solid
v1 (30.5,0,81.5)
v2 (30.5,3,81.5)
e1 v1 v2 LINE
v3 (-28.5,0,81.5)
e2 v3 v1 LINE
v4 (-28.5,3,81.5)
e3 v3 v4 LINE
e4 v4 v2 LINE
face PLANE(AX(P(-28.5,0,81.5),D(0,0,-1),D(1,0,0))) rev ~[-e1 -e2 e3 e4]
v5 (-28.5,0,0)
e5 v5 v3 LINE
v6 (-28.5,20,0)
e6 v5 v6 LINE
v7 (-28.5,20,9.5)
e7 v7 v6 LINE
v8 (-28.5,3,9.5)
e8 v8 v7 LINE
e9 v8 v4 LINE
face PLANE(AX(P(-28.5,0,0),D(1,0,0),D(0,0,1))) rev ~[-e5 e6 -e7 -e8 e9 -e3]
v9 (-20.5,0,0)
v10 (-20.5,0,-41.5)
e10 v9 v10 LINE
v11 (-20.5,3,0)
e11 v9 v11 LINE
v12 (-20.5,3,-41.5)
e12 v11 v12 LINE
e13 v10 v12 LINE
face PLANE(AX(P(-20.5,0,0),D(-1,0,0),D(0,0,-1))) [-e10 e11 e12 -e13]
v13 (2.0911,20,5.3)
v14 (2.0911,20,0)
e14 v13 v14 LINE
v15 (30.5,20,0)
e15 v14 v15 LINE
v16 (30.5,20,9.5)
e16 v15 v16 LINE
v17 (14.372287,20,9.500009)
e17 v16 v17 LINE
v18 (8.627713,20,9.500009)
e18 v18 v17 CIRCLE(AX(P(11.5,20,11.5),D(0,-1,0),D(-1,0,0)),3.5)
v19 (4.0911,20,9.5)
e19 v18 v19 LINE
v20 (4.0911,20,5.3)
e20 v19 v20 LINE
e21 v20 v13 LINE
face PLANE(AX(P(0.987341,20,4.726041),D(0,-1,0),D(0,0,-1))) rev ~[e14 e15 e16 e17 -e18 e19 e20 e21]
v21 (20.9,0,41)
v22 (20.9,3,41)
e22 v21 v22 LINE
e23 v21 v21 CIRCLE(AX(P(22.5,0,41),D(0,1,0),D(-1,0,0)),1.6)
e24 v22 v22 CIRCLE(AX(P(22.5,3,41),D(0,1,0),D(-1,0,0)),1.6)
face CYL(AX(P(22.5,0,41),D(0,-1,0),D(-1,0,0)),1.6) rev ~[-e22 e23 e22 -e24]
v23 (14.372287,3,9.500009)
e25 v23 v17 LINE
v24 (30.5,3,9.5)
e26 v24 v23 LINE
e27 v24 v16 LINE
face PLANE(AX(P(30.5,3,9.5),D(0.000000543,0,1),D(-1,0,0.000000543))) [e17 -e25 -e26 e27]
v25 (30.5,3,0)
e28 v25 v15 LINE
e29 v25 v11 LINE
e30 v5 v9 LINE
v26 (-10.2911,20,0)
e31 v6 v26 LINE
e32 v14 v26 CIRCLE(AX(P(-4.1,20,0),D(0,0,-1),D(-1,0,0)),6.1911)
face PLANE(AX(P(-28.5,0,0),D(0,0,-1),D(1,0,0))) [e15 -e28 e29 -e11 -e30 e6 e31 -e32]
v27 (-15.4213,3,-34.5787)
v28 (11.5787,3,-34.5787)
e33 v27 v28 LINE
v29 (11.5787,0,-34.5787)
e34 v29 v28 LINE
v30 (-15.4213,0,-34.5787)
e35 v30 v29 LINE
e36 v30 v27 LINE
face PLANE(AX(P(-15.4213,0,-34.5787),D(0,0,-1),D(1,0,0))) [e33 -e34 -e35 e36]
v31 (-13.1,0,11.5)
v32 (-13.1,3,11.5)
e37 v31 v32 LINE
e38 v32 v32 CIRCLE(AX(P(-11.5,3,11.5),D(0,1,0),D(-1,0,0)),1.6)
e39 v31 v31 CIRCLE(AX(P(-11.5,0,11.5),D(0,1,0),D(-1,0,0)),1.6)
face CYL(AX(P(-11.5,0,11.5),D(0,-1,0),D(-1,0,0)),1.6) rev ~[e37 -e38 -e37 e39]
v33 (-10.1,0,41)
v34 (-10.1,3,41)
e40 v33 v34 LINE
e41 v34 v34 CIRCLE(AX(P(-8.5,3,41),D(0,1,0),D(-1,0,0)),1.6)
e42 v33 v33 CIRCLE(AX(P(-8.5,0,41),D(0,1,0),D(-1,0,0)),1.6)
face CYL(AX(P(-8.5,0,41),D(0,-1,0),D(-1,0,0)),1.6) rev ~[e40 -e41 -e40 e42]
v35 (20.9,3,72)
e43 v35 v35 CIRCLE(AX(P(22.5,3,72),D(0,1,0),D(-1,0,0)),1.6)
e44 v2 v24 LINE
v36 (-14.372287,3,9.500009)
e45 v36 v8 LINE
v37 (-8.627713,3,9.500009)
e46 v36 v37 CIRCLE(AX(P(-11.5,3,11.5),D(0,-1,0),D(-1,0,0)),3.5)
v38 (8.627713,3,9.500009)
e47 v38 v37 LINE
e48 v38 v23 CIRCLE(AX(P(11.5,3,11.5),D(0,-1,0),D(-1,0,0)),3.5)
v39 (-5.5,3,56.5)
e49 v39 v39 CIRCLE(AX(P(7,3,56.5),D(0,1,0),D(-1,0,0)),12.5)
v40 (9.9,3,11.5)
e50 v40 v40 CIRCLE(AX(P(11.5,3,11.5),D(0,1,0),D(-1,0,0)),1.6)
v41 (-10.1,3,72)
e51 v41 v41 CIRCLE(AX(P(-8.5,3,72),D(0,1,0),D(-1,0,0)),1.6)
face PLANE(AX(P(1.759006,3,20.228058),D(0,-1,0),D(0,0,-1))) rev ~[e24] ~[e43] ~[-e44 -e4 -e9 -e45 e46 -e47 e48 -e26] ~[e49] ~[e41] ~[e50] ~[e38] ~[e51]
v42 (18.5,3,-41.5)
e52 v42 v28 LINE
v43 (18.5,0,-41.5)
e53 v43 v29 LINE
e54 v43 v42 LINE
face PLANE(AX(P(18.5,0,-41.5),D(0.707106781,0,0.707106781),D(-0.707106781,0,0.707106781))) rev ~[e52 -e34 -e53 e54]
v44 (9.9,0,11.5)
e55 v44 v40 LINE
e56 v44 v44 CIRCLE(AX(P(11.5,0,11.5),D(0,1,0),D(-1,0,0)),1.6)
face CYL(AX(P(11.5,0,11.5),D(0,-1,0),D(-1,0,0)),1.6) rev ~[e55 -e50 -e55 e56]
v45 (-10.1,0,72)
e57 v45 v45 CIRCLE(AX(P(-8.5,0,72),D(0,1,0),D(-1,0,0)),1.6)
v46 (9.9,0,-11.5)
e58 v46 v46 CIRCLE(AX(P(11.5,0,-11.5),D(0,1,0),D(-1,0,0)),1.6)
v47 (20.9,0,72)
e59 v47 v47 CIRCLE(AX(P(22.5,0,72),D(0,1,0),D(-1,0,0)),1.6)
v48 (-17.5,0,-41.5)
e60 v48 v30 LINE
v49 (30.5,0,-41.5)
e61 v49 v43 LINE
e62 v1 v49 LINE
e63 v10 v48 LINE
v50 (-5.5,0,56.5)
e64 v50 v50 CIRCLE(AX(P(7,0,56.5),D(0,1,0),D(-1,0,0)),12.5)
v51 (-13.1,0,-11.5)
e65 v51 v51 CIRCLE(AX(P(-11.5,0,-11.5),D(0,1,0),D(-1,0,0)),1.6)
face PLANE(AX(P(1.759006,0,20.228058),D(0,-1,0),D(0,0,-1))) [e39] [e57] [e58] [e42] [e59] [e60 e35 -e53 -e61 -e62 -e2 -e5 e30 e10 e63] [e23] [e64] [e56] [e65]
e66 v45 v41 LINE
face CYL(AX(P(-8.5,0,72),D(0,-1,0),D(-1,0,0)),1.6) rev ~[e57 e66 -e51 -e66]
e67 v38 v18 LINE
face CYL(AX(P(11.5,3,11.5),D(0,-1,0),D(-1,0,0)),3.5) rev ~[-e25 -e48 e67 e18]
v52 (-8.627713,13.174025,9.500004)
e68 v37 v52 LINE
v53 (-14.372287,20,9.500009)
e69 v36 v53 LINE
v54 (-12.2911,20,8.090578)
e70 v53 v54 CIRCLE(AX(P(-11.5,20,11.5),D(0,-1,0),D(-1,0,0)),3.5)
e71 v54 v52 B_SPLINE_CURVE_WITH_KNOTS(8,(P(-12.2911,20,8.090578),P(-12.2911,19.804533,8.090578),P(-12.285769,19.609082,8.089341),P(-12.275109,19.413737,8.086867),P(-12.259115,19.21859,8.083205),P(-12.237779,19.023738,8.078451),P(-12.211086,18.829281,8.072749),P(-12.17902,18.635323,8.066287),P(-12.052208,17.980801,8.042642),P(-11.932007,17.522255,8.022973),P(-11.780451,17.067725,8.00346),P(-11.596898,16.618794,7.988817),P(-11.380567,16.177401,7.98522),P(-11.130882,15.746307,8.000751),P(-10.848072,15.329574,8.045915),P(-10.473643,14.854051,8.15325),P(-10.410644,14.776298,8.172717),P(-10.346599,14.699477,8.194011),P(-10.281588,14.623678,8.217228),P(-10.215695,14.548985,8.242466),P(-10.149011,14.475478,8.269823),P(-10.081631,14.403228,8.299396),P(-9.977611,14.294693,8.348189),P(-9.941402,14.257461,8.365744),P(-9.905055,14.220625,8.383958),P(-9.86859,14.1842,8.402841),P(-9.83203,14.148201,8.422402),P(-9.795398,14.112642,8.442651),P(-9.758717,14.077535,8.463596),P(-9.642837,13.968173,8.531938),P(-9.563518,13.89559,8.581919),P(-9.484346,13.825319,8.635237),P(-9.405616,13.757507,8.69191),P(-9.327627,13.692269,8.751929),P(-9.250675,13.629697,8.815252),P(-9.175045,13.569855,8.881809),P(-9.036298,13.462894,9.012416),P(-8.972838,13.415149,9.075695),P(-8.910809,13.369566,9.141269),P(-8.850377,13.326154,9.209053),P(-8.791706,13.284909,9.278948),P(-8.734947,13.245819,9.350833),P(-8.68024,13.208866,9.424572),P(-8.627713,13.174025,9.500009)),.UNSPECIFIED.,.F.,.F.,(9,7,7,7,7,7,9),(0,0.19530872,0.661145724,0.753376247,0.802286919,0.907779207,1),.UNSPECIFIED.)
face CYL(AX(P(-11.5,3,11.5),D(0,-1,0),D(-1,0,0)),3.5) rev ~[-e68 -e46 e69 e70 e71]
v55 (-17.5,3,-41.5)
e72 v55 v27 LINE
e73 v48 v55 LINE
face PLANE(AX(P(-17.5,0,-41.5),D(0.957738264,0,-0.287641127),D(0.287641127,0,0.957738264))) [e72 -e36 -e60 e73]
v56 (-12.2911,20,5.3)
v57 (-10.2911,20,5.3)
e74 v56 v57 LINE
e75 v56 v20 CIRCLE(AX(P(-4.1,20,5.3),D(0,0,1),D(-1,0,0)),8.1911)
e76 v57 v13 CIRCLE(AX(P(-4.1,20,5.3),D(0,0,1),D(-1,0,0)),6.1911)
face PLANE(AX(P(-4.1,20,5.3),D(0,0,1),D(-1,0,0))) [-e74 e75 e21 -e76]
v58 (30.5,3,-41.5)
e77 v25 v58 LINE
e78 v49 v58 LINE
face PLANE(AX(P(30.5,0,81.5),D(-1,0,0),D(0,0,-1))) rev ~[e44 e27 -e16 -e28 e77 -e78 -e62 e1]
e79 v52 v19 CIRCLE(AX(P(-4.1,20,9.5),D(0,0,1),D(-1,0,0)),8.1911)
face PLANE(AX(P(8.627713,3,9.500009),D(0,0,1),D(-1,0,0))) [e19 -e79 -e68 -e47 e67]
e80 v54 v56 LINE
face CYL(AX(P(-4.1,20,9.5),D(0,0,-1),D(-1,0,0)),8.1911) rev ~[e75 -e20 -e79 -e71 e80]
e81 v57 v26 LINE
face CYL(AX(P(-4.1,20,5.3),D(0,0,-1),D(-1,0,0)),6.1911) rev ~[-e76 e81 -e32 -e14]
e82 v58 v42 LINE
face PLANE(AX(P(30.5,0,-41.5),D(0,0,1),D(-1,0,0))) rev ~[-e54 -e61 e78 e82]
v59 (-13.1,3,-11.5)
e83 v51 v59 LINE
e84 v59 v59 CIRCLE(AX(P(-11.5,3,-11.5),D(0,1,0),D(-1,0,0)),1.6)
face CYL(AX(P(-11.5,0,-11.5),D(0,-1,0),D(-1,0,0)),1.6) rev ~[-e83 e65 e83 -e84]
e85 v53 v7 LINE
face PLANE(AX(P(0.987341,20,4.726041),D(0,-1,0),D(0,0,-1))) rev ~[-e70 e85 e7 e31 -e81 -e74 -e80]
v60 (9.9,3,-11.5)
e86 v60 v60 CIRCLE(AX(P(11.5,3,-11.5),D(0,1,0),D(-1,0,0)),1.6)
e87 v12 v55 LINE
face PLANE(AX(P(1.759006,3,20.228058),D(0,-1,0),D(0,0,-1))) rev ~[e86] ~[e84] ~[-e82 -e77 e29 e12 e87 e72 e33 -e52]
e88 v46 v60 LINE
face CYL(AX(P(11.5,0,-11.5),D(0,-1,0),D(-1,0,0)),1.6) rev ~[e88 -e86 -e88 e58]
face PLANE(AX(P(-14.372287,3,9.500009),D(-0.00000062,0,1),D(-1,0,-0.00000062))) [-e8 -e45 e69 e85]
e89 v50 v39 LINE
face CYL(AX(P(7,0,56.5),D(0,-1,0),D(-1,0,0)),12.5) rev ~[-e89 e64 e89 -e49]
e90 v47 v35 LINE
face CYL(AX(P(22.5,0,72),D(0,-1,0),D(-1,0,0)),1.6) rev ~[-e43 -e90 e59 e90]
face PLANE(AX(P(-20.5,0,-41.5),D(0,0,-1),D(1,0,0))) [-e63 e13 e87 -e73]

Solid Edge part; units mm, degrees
sketch "Sketch1" plane through (0, 0, 0) normal (0, 1, 0) x (-1, 0, 0)
  circle A0 centre (-11.5, 11.5) radius 1.6
  circle A1 centre (11.5, 11.5) radius 1.6
  circle A2 centre (-11.5, -11.5) radius 1.6
  circle A3 centre (11.5, -11.5) radius 1.6
  circle A4 centre (-7, 56.5) radius 12.5
  circle A5 centre (-22.5, 72) radius 1.6
  circle A6 centre (8.5, 72) radius 1.6
  circle A7 centre (8.5, 41) radius 1.6
  circle A8 centre (-22.5, 41) radius 1.6
  line L0 (20.5, -41.5) -> (17.5, -41.5)
  line L1 (17.5, -41.5) -> (15.4213, -34.5787)
  line L2 (15.4213, -34.5787) -> (-11.5787, -34.5787)
  line L3 (-18.5, -41.5) -> (-11.5787, -34.5787)
  line L4 (-30.5, -41.5) -> (-18.5, -41.5)
  line L5 (-30.5, 81.5) -> (-30.5, -41.5)
  line L6 (28.5, 81.5) -> (-30.5, 81.5)
  line L7 (28.5, 0) -> (28.5, 81.5)
  line L8 (28.5, 0) -> (20.5, 0)
  line L9 (20.5, 0) -> (20.5, -41.5)
  dimension "D1" = 17
  dimension "D2" = 23
  dimension "D3" = 23
  dimension "D4" = 70
  dimension "D5" = 18.5
  dimension "D6" = 45
  dimension "D7" = 31
  dimension "D8" = 31
  dimension "D9" = 8
  dimension "D10" = 3
extrude "Protrusion1" add sketch "Sketch1" along normal blind 3
sketch "Sketch2" plane through (1, 3, 20) normal (0, 1, 0) x (-1, 0, 0)
  line L0 (15.3723, -10.5) -> (29.5, -10.5)
  line L1 (29.5, -10.5) -> (29.5, -20)
  line L2 (29.5, -20) -> (21.5, -20)
  line L3 (-29.5, -20) -> (21.5, -20)
  line L4 (-29.5, -20) -> (-29.5, -10.5)
  line L5 (-29.5, -10.5) -> (-13.3723, -10.5)
  line L6 (-7.6277, -10.5) -> (9.6277, -10.5)
  arc A0 (15.3723, -10.5) -> (9.6277, -10.5) centre (12.5, -8.5) cw
  arc A1 (-7.6277, -10.5) -> (-13.3723, -10.5) centre (-10.5, -8.5) cw
  dimension "D1" = 9.5
extrude "Protrusion2" add sketch "Sketch2" along normal blind 17
sketch "Sketch3" plane through (1, 20, -16.25) normal (0, 1, 0) x (-1, 0, 0)
  line L0 (13.2911, 25.75) -> (13.2911, 21.55)
  line L1 (13.2911, 21.55) -> (11.2911, 21.55)
  line L2 (11.2911, 21.55) -> (11.2911, 15.75)
  line L3 (11.2911, 15.75) -> (13.3, 15.75)
  line L4 (13.3, 15.75) -> (13.3, 12.25)
  line L5 (13.3, 12.25) -> (17.1, 12.25)
  line L6 (17.1, 12.25) -> (17.1, -19.45)
  line L7 (17.1, -19.45) -> (5.1, -19.45)
  line L8 (13.2911, 25.75) -> (5.1, 25.75)
  dimension "D1" = 1.6
  dimension "D2" = 2
revolve "RevolvedCutout_1" cut sketch "Sketch3" angle 180 about axis through (-4.1, 20, -35.7) along (0, 0, 1)
